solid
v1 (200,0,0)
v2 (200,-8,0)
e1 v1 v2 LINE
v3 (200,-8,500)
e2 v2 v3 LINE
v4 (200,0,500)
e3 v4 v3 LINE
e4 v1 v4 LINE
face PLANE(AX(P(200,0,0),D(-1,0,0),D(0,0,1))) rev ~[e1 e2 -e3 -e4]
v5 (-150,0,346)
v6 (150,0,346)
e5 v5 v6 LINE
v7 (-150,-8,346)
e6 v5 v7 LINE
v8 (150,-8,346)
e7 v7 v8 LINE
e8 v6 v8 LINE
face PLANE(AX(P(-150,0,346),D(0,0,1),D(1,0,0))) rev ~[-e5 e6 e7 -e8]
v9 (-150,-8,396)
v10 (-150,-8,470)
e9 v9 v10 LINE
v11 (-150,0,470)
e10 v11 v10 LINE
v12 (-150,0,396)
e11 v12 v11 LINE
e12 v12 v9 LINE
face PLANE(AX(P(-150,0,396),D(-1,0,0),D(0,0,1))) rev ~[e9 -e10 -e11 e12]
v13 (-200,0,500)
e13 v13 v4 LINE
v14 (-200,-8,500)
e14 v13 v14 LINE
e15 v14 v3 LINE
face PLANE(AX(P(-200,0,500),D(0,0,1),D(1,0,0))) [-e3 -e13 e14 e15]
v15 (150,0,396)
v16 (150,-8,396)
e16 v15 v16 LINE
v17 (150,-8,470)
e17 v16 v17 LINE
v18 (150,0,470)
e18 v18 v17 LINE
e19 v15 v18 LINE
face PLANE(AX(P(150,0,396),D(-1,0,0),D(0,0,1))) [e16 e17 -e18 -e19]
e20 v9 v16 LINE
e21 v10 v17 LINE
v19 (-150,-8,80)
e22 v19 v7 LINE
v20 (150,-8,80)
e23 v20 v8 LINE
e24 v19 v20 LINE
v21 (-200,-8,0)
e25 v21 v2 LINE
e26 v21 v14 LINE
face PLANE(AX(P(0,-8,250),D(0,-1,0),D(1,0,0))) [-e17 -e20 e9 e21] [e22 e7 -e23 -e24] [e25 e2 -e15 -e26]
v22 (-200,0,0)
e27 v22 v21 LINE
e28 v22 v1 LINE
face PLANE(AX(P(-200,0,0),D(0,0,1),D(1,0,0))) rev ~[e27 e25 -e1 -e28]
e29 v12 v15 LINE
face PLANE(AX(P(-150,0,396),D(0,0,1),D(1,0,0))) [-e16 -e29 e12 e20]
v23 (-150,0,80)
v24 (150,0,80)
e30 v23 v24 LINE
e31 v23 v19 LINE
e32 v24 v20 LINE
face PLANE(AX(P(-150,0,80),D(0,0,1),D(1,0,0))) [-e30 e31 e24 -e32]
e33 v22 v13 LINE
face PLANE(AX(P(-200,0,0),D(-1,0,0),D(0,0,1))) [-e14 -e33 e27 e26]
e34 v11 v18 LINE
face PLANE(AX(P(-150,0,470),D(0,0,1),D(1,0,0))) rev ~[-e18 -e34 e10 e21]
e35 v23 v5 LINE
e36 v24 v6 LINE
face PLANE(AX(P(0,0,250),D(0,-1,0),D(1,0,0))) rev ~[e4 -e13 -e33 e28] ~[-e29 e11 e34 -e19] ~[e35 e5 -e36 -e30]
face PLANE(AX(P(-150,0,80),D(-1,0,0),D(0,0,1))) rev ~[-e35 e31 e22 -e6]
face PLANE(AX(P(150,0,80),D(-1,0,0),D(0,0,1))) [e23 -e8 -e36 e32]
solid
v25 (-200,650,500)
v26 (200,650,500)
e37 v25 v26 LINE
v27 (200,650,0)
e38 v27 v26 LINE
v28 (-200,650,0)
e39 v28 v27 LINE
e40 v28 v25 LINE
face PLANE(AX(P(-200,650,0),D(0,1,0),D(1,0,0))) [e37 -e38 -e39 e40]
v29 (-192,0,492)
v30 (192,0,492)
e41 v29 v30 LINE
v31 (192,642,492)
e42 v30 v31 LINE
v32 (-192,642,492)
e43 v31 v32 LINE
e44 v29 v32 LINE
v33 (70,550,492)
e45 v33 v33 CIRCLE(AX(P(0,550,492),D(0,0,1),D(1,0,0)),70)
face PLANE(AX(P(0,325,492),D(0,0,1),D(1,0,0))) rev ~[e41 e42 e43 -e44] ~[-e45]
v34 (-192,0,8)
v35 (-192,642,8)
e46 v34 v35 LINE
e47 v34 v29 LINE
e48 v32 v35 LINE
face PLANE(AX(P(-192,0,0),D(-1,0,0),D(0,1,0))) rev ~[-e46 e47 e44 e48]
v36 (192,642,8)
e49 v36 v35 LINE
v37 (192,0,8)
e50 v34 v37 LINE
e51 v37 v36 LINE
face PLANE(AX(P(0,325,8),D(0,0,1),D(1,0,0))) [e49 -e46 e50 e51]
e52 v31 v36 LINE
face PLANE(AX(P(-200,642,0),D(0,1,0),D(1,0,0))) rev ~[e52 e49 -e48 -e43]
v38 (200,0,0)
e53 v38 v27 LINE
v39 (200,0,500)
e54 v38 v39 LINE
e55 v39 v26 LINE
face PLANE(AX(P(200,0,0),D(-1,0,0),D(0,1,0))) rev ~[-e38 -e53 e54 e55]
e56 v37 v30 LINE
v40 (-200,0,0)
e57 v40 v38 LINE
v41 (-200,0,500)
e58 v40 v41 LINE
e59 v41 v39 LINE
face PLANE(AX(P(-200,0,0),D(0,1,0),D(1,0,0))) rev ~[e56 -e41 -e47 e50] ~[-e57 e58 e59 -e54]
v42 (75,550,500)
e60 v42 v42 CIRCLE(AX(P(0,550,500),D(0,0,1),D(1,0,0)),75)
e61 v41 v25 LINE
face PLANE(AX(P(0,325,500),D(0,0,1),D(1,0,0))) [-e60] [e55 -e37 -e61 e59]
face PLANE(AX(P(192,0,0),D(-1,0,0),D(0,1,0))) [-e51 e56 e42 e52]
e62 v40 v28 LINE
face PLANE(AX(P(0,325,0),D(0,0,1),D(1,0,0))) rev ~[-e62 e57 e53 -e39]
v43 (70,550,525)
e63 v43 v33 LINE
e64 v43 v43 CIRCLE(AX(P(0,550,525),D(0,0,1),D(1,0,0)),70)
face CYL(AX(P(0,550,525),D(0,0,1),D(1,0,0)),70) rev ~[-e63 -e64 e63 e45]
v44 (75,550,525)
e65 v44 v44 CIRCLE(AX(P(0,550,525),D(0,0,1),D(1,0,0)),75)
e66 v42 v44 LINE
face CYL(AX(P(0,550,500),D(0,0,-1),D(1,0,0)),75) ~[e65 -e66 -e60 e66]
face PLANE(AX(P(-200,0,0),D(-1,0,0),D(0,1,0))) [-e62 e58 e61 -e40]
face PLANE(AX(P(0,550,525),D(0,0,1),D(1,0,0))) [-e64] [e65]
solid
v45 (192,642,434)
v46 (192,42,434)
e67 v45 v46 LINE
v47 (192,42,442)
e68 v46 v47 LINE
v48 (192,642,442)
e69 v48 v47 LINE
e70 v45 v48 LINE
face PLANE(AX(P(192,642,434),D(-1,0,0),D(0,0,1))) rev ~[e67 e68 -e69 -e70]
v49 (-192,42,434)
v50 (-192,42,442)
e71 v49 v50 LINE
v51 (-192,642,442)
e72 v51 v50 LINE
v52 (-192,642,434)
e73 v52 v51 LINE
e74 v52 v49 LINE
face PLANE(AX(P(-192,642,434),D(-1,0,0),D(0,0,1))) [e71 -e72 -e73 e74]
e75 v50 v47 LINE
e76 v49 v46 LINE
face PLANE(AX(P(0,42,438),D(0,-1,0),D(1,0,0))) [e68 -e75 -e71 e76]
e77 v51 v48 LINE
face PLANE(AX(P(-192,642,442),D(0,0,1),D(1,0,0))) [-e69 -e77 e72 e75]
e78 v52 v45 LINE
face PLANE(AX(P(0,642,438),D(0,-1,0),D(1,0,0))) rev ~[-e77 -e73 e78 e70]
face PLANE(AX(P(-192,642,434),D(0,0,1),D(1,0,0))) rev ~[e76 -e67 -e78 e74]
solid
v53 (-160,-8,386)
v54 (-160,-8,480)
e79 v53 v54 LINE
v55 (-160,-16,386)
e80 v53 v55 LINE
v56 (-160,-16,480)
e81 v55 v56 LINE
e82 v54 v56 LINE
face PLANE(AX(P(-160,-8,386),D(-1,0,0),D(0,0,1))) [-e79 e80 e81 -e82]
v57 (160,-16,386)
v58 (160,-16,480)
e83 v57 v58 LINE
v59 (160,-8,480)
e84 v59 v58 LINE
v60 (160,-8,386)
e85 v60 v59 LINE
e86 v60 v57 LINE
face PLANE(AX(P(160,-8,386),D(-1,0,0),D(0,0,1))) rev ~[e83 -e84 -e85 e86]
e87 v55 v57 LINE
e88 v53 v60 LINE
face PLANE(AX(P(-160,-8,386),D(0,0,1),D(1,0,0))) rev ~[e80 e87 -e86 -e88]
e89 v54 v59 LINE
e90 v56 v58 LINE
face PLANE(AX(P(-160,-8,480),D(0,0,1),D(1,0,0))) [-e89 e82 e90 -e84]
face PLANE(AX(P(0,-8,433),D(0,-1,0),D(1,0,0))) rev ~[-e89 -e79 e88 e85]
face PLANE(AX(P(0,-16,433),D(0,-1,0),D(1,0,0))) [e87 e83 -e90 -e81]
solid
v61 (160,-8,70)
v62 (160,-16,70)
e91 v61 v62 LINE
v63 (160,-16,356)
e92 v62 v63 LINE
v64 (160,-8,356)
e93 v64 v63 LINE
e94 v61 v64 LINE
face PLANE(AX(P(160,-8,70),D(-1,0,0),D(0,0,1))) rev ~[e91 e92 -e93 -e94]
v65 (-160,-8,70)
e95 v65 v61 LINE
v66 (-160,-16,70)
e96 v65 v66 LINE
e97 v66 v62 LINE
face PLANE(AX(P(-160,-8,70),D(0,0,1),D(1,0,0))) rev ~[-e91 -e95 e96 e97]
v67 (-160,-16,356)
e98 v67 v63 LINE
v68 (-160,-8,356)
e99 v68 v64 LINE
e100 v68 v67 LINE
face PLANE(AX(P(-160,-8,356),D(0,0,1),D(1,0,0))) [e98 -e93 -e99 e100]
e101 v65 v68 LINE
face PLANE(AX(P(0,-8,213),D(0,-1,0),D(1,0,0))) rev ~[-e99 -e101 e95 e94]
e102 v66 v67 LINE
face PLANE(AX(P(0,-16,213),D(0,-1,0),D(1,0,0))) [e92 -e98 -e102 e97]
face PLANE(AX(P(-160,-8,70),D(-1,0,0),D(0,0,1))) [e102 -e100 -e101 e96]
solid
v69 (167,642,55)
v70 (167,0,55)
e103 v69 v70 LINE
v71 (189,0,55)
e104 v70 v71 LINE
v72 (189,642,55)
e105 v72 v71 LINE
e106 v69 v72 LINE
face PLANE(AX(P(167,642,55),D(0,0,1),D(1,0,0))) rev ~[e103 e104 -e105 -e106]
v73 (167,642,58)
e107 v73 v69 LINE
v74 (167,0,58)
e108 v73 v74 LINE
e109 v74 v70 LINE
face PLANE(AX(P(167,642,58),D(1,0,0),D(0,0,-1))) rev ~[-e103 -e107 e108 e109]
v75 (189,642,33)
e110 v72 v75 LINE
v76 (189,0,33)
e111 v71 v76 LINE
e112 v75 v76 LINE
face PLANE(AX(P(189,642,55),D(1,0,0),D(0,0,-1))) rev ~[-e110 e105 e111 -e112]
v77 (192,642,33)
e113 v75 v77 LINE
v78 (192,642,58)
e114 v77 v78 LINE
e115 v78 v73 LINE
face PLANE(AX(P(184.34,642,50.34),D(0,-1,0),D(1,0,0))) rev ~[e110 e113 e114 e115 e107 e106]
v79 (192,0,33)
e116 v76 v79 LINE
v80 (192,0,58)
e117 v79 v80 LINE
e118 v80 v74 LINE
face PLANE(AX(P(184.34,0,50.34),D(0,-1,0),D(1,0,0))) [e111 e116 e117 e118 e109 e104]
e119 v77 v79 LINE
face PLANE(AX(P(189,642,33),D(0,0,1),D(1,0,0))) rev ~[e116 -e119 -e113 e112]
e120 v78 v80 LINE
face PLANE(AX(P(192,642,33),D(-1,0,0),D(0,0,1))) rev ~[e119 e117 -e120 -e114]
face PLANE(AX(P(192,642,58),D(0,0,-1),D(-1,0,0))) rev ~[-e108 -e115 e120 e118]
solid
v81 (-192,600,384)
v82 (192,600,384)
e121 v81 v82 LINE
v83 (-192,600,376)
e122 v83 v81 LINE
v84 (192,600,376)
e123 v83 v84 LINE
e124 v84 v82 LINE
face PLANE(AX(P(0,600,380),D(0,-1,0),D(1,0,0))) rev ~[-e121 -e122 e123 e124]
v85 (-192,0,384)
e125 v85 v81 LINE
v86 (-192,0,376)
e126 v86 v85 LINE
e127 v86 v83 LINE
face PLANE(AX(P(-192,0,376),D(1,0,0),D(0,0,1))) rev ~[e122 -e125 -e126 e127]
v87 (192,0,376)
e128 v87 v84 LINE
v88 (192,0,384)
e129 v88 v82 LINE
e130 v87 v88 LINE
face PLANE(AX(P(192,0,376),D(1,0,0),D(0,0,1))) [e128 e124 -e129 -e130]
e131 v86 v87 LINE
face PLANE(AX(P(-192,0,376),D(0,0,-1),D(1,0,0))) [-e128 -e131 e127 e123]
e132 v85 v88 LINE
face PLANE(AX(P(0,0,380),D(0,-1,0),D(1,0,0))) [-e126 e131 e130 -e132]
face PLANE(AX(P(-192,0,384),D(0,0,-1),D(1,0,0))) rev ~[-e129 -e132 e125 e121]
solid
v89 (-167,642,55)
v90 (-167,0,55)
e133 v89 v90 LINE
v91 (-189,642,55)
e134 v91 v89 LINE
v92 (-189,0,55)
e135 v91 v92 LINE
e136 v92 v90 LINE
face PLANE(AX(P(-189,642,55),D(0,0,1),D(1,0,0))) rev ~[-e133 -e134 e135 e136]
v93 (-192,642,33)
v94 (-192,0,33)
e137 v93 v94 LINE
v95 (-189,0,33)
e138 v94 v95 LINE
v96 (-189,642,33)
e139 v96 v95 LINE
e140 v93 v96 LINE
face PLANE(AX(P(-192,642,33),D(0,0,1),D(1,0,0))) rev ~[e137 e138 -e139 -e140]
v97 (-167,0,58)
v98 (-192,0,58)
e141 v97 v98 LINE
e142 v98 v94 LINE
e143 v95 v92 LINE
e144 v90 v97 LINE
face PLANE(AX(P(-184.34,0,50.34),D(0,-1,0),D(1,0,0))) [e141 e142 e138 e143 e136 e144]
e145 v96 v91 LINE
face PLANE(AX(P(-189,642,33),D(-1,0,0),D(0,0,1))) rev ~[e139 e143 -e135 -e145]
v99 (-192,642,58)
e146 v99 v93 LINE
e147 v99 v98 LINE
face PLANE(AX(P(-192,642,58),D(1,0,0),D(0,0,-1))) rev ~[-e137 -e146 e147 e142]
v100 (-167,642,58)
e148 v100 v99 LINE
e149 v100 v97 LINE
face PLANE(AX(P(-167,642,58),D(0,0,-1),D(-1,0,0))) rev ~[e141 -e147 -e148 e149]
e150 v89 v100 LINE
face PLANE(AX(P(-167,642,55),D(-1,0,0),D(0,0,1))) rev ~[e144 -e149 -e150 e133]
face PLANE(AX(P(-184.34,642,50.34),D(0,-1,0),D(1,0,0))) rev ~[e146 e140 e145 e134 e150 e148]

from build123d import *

# Parameters (mm, degrees)
F1_W      = 400
F1_H      = 650
F2_DEPTH  = 500
F3_T      = -8
F4_W      = 384
F4_H      = 8
F5_DEPTH  = 600
F6_W      = 384
F6_H      = 8
F7_DEPTH  = 600
F9_DEPTH  = 642
F10_R     = 75
F11_DEPTH = 25
F12_R     = 70
F13_DEPTH = 33
F14_W     = 400
F14_H     = 500
F14_W_2   = 300
F14_H_2   = 266
F14_H_3   = 74
F15_DEPTH = 8
F16_W     = 320
F16_H     = 94
F17_DEPTH = 8
F16_H_2   = 286


with BuildPart() as f2:
    # F1 (on Top) → F2 (new body)
    with BuildSketch(Plane.XY):
        with Locations((0, 325)):
            Rectangle(F1_W, F1_H)
    extrude(amount=F2_DEPTH)

    # F3
    f3_openings = [f2.faces().sort_by_distance(p)[0] for p in [
        (0, 0, 250),
    ]]
    offset(amount=F3_T, openings=f3_openings)

    # F10 (on face) → F11 (join)
    with BuildSketch(Plane.XY.offset(500)):
        with Locations((0, 550)):
            Circle(F10_R)
    extrude(amount=F11_DEPTH)

    # F12 (on face) → F13 (cut, through all)
    with BuildSketch(Plane.XY.offset(525)):
        with Locations((0, 550)):
            Circle(F12_R)
    extrude(amount=-F13_DEPTH, mode=Mode.SUBTRACT)


with BuildPart() as f5:
    # F4 (on face) → F5 (new body)
    with BuildSketch(Plane.XZ.offset(-642)):
        with Locations((0, 438)):
            Rectangle(F4_W, F4_H)
    extrude(amount=F5_DEPTH)


with BuildPart() as f7:
    # F6 (on face) → F7 (new body)
    with BuildSketch(Plane.XZ):
        with Locations((0, 380)):
            Rectangle(F6_W, F6_H)
    extrude(amount=-F7_DEPTH)


with BuildPart() as f9:
    # F8 (on face) → F9 (new body, through all)
    with BuildSketch(Plane.XZ.offset(-642)):
        Polygon((-167, 55), (-167, 58), (-192, 58), (-192, 33), (-189, 33), (-189, 55), align=None)
    extrude(amount=F9_DEPTH)


with BuildPart() as f9b:
    # F8 (on face) → F9, piece 2 (new body, through all)
    with BuildSketch(Plane.XZ.offset(-642)):
        Polygon((189, 33), (192, 33), (192, 58), (167, 58), (167, 55), (189, 55), align=None)
    extrude(amount=F9_DEPTH)


with BuildPart() as f15:
    # F14 (on face) → F15 (new body)
    with BuildSketch(Plane.XZ):
        with Locations((0, 250)):
            Rectangle(F14_W, F14_H)
        with Locations((0, 213)):
            Rectangle(F14_W_2, F14_H_2, mode=Mode.SUBTRACT)
        with Locations((0, 433)):
            Rectangle(F14_W_2, F14_H_3, mode=Mode.SUBTRACT)
    extrude(amount=F15_DEPTH)


with BuildPart() as f17:
    # F16 (on face) → F17 (new body)
    with BuildSketch(Plane.XZ.offset(8)):
        with Locations((0, 433)):
            Rectangle(F16_W, F16_H)
    extrude(amount=F17_DEPTH)


with BuildPart() as f17b:
    # F16 (on face) → F17, piece 2 (new body)
    with BuildSketch(Plane.XZ.offset(8)):
        with Locations((0, 213)):
            Rectangle(F16_W, F16_H_2)
    extrude(amount=F17_DEPTH)


solid = Compound([f2.part, f5.part, f7.part, f9.part, f9b.part, f15.part, f17.part, f17b.part])
